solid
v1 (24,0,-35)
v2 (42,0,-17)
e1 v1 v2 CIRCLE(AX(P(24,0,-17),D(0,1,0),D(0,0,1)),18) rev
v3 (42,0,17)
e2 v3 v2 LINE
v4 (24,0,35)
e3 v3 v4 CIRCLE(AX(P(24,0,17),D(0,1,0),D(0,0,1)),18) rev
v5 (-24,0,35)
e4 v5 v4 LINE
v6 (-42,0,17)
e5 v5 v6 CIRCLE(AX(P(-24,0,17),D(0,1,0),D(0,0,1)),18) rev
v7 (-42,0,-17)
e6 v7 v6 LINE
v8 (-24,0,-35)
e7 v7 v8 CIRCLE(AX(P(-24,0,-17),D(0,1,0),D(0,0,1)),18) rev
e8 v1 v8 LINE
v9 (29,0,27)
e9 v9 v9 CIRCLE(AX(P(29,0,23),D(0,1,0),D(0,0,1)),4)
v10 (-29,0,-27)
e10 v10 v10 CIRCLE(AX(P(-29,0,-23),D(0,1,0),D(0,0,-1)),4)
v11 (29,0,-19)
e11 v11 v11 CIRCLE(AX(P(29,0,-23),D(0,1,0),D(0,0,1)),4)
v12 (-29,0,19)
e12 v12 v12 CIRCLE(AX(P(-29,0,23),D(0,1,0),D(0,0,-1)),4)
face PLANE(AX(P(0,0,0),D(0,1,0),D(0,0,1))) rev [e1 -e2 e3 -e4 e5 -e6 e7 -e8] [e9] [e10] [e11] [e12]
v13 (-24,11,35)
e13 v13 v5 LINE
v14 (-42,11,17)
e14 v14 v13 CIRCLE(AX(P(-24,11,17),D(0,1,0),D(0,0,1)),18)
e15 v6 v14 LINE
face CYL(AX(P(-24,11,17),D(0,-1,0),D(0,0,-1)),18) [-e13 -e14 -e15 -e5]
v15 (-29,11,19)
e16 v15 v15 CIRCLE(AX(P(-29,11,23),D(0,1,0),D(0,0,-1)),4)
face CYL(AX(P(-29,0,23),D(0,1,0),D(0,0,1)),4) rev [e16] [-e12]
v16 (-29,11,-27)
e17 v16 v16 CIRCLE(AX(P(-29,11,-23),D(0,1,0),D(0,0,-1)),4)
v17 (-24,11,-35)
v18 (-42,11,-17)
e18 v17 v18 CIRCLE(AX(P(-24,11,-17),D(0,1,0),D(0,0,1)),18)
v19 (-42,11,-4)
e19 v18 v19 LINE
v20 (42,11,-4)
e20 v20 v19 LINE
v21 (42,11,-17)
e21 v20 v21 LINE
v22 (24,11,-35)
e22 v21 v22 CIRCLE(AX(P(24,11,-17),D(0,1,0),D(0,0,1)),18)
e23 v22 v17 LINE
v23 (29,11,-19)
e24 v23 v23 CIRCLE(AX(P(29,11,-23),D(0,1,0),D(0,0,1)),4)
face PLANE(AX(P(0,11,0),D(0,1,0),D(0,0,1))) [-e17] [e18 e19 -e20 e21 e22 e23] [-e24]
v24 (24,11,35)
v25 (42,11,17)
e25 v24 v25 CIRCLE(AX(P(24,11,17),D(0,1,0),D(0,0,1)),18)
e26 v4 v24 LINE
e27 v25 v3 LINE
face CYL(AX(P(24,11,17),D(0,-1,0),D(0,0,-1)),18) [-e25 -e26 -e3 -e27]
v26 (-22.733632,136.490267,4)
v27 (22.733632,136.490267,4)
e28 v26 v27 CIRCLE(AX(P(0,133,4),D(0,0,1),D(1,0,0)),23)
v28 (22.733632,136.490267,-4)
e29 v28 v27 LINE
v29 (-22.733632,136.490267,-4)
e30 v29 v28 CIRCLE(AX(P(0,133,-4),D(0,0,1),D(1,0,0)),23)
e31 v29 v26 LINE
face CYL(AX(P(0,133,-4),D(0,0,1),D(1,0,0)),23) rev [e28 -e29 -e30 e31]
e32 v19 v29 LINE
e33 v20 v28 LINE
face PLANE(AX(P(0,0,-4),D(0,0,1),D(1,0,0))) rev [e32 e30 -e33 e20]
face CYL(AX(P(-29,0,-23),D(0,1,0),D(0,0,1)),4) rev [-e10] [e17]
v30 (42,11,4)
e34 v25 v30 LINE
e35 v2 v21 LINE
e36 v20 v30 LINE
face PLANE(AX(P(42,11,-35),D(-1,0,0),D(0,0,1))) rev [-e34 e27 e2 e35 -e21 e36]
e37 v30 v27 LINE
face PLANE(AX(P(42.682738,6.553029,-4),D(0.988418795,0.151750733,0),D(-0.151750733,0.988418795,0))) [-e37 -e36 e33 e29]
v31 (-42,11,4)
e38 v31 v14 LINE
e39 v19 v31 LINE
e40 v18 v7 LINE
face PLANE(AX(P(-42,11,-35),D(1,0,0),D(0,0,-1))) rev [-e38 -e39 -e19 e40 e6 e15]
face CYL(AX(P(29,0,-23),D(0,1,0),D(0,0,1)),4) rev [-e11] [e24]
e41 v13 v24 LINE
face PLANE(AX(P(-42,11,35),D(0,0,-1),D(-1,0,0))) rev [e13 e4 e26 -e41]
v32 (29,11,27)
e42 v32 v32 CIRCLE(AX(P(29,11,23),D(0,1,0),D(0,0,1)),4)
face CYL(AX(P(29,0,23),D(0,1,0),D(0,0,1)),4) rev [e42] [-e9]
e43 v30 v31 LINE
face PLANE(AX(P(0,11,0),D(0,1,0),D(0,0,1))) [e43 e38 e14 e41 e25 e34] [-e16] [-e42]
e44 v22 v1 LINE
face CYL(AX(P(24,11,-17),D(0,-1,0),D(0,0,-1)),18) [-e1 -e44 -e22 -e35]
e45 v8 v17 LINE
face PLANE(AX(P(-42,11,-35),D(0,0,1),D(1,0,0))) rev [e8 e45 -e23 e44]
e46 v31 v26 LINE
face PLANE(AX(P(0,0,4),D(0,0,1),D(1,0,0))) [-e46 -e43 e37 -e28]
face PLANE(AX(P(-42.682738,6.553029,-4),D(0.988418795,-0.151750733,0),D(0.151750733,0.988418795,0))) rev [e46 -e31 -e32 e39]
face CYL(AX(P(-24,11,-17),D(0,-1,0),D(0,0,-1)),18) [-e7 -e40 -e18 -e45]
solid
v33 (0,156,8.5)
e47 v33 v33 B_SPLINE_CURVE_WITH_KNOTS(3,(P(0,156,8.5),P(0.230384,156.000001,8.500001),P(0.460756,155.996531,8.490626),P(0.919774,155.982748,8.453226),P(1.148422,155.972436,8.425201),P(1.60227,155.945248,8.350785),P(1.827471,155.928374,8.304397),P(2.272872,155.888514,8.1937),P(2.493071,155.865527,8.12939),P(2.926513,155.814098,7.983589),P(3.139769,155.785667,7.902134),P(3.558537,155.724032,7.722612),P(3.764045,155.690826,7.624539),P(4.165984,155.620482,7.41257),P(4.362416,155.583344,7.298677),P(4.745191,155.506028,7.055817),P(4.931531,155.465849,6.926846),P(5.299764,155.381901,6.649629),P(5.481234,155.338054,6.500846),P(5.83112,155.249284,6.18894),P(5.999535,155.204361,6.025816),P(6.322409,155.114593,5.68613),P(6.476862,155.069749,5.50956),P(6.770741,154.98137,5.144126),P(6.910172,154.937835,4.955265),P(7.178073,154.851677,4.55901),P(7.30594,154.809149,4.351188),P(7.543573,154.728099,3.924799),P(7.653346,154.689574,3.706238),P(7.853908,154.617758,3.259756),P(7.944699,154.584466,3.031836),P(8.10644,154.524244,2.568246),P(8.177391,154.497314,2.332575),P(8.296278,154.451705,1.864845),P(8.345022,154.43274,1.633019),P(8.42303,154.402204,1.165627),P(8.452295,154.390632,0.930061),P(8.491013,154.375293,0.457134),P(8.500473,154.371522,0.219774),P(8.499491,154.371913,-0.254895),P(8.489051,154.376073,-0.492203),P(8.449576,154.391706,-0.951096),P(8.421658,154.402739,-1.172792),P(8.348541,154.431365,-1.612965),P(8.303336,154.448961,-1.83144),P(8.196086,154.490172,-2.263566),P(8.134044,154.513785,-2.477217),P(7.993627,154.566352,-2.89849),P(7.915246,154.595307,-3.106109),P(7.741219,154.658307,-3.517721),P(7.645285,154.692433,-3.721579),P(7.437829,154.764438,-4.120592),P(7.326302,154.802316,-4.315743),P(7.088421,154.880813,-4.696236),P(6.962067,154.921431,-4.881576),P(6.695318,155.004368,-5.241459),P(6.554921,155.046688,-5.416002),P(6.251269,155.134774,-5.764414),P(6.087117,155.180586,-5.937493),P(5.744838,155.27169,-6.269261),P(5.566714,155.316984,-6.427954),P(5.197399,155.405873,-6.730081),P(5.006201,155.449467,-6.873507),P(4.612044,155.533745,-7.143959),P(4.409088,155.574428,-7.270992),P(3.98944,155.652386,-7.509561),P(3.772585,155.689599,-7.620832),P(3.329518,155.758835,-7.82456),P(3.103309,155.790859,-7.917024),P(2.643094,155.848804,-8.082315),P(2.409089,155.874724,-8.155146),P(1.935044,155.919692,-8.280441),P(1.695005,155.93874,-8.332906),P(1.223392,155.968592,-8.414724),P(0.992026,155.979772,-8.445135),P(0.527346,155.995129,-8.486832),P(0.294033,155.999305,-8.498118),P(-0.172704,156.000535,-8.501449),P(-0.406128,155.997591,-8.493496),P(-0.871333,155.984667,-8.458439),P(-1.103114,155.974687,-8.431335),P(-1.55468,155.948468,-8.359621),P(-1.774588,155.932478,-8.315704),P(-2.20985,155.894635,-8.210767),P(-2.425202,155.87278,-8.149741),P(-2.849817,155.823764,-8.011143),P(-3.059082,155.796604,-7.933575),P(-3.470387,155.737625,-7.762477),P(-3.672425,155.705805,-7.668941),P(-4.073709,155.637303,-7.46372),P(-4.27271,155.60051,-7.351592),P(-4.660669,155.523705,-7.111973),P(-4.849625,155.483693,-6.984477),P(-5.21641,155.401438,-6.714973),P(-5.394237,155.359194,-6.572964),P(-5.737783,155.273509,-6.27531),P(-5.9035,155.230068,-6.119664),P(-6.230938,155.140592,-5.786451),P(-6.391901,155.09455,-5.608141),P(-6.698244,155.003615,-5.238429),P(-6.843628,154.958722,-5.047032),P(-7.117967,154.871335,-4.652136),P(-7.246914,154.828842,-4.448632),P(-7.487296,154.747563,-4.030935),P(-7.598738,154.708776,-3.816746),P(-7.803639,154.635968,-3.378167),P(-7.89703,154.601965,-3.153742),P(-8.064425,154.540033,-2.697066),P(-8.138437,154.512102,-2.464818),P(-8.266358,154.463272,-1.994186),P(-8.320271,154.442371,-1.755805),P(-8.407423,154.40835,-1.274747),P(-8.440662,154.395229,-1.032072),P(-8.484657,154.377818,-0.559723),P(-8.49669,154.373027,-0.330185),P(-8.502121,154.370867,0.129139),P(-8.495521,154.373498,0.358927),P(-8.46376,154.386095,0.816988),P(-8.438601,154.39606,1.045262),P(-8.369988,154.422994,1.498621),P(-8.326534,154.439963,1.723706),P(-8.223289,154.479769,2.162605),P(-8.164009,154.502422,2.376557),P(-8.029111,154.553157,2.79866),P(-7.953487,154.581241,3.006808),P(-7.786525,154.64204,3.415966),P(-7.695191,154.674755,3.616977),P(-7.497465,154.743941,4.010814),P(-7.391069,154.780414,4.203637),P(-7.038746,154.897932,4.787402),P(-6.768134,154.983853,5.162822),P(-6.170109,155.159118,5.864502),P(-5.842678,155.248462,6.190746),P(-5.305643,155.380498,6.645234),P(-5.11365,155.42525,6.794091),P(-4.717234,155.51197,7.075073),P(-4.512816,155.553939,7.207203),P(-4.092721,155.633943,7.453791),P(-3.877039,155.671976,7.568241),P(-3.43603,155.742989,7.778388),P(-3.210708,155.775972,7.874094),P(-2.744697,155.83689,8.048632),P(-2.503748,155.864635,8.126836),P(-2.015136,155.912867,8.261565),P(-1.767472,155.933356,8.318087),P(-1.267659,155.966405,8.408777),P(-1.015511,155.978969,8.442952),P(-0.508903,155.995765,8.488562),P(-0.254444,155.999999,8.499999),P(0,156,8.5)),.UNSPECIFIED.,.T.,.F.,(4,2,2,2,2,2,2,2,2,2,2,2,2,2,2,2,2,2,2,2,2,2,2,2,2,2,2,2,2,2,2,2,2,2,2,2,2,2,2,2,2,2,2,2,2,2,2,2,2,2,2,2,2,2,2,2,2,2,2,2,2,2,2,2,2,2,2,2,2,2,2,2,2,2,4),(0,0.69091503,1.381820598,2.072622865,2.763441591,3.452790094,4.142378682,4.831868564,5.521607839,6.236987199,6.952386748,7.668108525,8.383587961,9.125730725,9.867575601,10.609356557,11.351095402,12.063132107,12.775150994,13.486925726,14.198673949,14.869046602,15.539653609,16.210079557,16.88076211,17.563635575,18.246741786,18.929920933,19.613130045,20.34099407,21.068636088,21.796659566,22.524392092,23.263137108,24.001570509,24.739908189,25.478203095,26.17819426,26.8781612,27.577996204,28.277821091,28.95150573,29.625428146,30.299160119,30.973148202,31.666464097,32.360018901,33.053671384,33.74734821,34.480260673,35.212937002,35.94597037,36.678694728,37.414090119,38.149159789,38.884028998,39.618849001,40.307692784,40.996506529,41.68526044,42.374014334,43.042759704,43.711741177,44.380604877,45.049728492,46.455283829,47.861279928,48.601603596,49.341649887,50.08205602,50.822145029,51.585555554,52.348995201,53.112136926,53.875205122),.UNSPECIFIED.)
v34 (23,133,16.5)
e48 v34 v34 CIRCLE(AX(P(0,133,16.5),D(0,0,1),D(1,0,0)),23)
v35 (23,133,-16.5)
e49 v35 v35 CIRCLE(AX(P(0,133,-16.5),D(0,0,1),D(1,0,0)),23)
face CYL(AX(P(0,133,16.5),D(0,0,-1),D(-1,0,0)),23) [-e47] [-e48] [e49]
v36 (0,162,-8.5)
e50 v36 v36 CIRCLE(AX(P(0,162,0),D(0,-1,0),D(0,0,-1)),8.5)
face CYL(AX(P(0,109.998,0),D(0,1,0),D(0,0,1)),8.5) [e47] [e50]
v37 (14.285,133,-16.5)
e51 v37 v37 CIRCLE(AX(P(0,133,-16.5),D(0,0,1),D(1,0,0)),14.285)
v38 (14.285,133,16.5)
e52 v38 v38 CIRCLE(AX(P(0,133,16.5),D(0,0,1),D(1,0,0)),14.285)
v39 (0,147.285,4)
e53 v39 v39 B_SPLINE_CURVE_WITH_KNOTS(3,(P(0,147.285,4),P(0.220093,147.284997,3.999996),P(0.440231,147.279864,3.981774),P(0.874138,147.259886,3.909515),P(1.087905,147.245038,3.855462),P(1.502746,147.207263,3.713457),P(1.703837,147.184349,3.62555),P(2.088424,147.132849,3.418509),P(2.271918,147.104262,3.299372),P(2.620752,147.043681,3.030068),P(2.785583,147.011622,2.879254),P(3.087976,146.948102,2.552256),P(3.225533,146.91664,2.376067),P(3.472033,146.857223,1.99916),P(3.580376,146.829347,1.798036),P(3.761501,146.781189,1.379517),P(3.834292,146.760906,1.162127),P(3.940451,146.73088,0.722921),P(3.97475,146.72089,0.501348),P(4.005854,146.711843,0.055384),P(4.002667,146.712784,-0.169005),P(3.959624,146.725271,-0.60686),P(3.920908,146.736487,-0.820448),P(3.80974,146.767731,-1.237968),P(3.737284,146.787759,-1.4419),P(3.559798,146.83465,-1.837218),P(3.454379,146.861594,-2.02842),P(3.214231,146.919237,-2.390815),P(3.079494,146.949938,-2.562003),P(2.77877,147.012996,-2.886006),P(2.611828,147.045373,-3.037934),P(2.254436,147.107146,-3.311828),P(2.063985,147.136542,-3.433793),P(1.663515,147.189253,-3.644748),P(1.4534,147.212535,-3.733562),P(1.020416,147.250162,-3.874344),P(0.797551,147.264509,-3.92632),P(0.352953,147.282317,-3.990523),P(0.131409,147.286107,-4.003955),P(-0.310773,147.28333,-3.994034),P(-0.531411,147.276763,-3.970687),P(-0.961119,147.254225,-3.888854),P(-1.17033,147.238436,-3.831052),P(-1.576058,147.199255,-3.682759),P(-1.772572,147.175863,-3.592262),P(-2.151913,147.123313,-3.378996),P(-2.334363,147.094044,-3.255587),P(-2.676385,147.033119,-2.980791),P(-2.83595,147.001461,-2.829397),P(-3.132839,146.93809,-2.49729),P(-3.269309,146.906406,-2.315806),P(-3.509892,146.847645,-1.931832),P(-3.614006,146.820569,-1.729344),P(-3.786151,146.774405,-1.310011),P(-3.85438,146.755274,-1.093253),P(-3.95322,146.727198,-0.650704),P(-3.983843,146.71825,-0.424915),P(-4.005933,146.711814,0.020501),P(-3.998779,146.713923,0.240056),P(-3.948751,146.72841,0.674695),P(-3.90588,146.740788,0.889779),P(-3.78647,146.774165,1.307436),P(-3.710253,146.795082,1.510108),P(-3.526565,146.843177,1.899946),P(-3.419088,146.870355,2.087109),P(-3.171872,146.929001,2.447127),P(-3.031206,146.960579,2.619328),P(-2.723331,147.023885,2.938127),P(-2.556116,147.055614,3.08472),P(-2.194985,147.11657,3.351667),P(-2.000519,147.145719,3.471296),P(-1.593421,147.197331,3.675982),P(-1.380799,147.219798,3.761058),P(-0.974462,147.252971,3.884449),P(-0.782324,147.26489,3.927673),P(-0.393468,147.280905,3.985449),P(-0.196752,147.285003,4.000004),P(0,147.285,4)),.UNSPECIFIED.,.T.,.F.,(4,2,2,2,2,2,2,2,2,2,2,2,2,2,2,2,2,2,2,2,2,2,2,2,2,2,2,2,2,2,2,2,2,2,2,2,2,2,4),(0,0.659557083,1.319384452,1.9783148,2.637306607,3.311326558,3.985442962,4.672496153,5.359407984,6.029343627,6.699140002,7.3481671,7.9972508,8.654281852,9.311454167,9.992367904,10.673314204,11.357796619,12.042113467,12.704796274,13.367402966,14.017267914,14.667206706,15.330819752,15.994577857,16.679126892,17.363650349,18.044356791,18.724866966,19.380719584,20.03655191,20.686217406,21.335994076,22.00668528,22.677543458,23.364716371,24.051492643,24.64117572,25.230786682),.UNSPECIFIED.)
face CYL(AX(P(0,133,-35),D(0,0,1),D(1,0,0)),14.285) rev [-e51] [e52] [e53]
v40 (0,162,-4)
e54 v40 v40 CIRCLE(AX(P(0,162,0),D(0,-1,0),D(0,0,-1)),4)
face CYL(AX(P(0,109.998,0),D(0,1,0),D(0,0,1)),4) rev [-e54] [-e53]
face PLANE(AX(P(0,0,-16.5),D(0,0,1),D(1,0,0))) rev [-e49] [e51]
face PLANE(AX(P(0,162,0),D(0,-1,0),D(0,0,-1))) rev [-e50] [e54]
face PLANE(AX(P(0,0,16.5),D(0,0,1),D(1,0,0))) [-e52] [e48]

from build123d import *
from build123d.topology import SkipClean

# Parameters (mm, degrees)
SKETCH1_W                = 84
SKETCH1_H                = 70
BOSS_EXTRUDE1_DEPTH      = 11
SKETCH2_R                = 4
CUT_EXTRUDE1_DEPTH       = 56.767373974
FILLET1_R                = 18
BOSS_EXTRUDE2_DEPTH      = 4
SKETCH3_3_R              = 23
SKETCH3_3_R_2            = 14.285
BOSS_EXTRUDE3_DEPTH      = 16.5
CUT_EXTRUDE2_DEPTH       = 166.302752548
CUT_EXTRUDE2_DEPTH_BACK  = 166.302752548
SKETCH3_4_R              = 14.285
BOSS_EXTRUDE4_REACH      = 172.977
BOSS_EXTRUDE4_END_RADIUS = 23
SKETCH5_R                = 8.5
SKETCH5_R_2              = 4
CUT_EXTRUDE4_OUTLINE_W   = 4
CUT_EXTRUDE4_OUTLINE_H   = 15.28653943


# Read off the part's stored shape, not the designer's step: Cut-Extrude4
with BuildPart() as part:
    # Sketch1 → Boss-Extrude1 (new body)
    with BuildSketch(Plane(origin=(0, 0, 0), x_dir=(1, 0, 0), z_dir=(0, 1, 0))):
        Rectangle(SKETCH1_W, SKETCH1_H)
    extrude(amount=BOSS_EXTRUDE1_DEPTH)

    # Sketch2 → Cut-Extrude1 (cut, through all)
    with BuildSketch(Plane(origin=(0, 11, 0), x_dir=(1, 0, 0), z_dir=(0, 1, 0))):
        with Locations(Location((29, 23, 0), (0, 0, 270))):
            Circle(SKETCH2_R)
        with Locations(Location((29, -23, 0), (0, 0, 270))):
            Circle(SKETCH2_R)
        with Locations(Location((-29, -23, 0), (0, 0, 90))):
            Circle(SKETCH2_R)
        with Locations(Location((-29, 23, 0), (0, 0, 90))):
            Circle(SKETCH2_R)
    extrude(amount=-CUT_EXTRUDE1_DEPTH, mode=Mode.SUBTRACT)

    # Fillet1
    fillet1_edges = [part.edges().sort_by_distance(p)[0] for p in [
        (42, 5.5, 35),
        (-42, 5.5, 35),
        (-42, 5.5, -35),
        (42, 5.5, -35),
    ]]
    fillet(fillet1_edges, radius=FILLET1_R)

    # Sketch3 → Boss-Extrude2 (add, symmetric)
    with BuildSketch(Plane.XY):
        with BuildLine():
            Line((-22.733632294, 136.490266855), (-42, 11))
            Line((-42, 11), (-24, 11))
            Line((-24, 11), (24, 11))
            Line((24, 11), (42, 11))
            Line((42, 11), (22.733632294, 136.490266855))
            ThreePointArc((22.733632294, 136.490266855), (22.933311392, 134.750208164), (23, 133))
            ThreePointArc((23, 133), (-1.750208164, 110.066688608), (-22.733632294, 136.490266855))
        make_face()
    extrude(amount=BOSS_EXTRUDE2_DEPTH, both=True)


with BuildPart() as body_2:
    # Sketch3<3> → Boss-Extrude3 (new, symmetric)
    # profile 1 of 2: a face of its own
    with BuildSketch(Plane.XY):
        with Locations((0, 133)):
            Circle(SKETCH3_3_R)
        with Locations((0, 133)):
            Circle(SKETCH3_3_R_2, mode=Mode.SUBTRACT)
    # profile 2 of 2: a face of its own
    with BuildSketch(Plane.XY):
        with Locations((0, 133)):
            Circle(SKETCH3_3_R_2)
    extrude(amount=BOSS_EXTRUDE3_DEPTH, both=True)

    # Sketch3<4> → Cut-Extrude2 (cut, two sides: drawn at the far end of the back side and taken through both)
    with BuildSketch(Plane.XY.offset(-CUT_EXTRUDE2_DEPTH_BACK)):
        with Locations((0, 133)):
            Circle(SKETCH3_4_R)
    extrude(amount=CUT_EXTRUDE2_DEPTH + CUT_EXTRUDE2_DEPTH_BACK, mode=Mode.SUBTRACT)

    # Boss-Extrude4: up to this cylinder (the profile starts outside it)
    boss_extrude4_end = Plane(origin=(0, 133, -8.259584), z_dir=(0, 0, -1)) * Cylinder(BOSS_EXTRUDE4_END_RADIUS, 392.954, mode=Mode.PRIVATE)
    # Sketch5 → Boss-Extrude4 (add, up to the surface)
    with BuildSketch(Plane(origin=(0, 162, 0), x_dir=(-1, 0, 0), z_dir=(0, -1, 0)), mode=Mode.PRIVATE) as boss_extrude4_sk1:
        with Locations(Location((0, 0, 0), (0, 0, 270))):
            Circle(SKETCH5_R)
        with Locations(Location((0, 0, 0), (0, 0, 270))):
            Circle(SKETCH5_R_2, mode=Mode.SUBTRACT)
    boss_extrude4_tool1 = extrude(boss_extrude4_sk1.sketch, amount=BOSS_EXTRUDE4_REACH, mode=Mode.PRIVATE) - boss_extrude4_end
    add(boss_extrude4_tool1.solids().sort_by_distance((0, 162, -8.259584))[0])

    # Cut-Extrude4 outline → Cut-Extrude4 (revolve, cut)
    with SkipClean():  # the faces are left unmerged after this step: merging them gives an invalid solid
        with BuildSketch(Plane.XY):
            with Locations((2, 154.356730285)):
                Rectangle(CUT_EXTRUDE4_OUTLINE_W, CUT_EXTRUDE4_OUTLINE_H)
        revolve(axis=Axis((0, 0, 0), (0, 1, 0)), mode=Mode.SUBTRACT)


solid = Compound([part.part, body_2.part])
